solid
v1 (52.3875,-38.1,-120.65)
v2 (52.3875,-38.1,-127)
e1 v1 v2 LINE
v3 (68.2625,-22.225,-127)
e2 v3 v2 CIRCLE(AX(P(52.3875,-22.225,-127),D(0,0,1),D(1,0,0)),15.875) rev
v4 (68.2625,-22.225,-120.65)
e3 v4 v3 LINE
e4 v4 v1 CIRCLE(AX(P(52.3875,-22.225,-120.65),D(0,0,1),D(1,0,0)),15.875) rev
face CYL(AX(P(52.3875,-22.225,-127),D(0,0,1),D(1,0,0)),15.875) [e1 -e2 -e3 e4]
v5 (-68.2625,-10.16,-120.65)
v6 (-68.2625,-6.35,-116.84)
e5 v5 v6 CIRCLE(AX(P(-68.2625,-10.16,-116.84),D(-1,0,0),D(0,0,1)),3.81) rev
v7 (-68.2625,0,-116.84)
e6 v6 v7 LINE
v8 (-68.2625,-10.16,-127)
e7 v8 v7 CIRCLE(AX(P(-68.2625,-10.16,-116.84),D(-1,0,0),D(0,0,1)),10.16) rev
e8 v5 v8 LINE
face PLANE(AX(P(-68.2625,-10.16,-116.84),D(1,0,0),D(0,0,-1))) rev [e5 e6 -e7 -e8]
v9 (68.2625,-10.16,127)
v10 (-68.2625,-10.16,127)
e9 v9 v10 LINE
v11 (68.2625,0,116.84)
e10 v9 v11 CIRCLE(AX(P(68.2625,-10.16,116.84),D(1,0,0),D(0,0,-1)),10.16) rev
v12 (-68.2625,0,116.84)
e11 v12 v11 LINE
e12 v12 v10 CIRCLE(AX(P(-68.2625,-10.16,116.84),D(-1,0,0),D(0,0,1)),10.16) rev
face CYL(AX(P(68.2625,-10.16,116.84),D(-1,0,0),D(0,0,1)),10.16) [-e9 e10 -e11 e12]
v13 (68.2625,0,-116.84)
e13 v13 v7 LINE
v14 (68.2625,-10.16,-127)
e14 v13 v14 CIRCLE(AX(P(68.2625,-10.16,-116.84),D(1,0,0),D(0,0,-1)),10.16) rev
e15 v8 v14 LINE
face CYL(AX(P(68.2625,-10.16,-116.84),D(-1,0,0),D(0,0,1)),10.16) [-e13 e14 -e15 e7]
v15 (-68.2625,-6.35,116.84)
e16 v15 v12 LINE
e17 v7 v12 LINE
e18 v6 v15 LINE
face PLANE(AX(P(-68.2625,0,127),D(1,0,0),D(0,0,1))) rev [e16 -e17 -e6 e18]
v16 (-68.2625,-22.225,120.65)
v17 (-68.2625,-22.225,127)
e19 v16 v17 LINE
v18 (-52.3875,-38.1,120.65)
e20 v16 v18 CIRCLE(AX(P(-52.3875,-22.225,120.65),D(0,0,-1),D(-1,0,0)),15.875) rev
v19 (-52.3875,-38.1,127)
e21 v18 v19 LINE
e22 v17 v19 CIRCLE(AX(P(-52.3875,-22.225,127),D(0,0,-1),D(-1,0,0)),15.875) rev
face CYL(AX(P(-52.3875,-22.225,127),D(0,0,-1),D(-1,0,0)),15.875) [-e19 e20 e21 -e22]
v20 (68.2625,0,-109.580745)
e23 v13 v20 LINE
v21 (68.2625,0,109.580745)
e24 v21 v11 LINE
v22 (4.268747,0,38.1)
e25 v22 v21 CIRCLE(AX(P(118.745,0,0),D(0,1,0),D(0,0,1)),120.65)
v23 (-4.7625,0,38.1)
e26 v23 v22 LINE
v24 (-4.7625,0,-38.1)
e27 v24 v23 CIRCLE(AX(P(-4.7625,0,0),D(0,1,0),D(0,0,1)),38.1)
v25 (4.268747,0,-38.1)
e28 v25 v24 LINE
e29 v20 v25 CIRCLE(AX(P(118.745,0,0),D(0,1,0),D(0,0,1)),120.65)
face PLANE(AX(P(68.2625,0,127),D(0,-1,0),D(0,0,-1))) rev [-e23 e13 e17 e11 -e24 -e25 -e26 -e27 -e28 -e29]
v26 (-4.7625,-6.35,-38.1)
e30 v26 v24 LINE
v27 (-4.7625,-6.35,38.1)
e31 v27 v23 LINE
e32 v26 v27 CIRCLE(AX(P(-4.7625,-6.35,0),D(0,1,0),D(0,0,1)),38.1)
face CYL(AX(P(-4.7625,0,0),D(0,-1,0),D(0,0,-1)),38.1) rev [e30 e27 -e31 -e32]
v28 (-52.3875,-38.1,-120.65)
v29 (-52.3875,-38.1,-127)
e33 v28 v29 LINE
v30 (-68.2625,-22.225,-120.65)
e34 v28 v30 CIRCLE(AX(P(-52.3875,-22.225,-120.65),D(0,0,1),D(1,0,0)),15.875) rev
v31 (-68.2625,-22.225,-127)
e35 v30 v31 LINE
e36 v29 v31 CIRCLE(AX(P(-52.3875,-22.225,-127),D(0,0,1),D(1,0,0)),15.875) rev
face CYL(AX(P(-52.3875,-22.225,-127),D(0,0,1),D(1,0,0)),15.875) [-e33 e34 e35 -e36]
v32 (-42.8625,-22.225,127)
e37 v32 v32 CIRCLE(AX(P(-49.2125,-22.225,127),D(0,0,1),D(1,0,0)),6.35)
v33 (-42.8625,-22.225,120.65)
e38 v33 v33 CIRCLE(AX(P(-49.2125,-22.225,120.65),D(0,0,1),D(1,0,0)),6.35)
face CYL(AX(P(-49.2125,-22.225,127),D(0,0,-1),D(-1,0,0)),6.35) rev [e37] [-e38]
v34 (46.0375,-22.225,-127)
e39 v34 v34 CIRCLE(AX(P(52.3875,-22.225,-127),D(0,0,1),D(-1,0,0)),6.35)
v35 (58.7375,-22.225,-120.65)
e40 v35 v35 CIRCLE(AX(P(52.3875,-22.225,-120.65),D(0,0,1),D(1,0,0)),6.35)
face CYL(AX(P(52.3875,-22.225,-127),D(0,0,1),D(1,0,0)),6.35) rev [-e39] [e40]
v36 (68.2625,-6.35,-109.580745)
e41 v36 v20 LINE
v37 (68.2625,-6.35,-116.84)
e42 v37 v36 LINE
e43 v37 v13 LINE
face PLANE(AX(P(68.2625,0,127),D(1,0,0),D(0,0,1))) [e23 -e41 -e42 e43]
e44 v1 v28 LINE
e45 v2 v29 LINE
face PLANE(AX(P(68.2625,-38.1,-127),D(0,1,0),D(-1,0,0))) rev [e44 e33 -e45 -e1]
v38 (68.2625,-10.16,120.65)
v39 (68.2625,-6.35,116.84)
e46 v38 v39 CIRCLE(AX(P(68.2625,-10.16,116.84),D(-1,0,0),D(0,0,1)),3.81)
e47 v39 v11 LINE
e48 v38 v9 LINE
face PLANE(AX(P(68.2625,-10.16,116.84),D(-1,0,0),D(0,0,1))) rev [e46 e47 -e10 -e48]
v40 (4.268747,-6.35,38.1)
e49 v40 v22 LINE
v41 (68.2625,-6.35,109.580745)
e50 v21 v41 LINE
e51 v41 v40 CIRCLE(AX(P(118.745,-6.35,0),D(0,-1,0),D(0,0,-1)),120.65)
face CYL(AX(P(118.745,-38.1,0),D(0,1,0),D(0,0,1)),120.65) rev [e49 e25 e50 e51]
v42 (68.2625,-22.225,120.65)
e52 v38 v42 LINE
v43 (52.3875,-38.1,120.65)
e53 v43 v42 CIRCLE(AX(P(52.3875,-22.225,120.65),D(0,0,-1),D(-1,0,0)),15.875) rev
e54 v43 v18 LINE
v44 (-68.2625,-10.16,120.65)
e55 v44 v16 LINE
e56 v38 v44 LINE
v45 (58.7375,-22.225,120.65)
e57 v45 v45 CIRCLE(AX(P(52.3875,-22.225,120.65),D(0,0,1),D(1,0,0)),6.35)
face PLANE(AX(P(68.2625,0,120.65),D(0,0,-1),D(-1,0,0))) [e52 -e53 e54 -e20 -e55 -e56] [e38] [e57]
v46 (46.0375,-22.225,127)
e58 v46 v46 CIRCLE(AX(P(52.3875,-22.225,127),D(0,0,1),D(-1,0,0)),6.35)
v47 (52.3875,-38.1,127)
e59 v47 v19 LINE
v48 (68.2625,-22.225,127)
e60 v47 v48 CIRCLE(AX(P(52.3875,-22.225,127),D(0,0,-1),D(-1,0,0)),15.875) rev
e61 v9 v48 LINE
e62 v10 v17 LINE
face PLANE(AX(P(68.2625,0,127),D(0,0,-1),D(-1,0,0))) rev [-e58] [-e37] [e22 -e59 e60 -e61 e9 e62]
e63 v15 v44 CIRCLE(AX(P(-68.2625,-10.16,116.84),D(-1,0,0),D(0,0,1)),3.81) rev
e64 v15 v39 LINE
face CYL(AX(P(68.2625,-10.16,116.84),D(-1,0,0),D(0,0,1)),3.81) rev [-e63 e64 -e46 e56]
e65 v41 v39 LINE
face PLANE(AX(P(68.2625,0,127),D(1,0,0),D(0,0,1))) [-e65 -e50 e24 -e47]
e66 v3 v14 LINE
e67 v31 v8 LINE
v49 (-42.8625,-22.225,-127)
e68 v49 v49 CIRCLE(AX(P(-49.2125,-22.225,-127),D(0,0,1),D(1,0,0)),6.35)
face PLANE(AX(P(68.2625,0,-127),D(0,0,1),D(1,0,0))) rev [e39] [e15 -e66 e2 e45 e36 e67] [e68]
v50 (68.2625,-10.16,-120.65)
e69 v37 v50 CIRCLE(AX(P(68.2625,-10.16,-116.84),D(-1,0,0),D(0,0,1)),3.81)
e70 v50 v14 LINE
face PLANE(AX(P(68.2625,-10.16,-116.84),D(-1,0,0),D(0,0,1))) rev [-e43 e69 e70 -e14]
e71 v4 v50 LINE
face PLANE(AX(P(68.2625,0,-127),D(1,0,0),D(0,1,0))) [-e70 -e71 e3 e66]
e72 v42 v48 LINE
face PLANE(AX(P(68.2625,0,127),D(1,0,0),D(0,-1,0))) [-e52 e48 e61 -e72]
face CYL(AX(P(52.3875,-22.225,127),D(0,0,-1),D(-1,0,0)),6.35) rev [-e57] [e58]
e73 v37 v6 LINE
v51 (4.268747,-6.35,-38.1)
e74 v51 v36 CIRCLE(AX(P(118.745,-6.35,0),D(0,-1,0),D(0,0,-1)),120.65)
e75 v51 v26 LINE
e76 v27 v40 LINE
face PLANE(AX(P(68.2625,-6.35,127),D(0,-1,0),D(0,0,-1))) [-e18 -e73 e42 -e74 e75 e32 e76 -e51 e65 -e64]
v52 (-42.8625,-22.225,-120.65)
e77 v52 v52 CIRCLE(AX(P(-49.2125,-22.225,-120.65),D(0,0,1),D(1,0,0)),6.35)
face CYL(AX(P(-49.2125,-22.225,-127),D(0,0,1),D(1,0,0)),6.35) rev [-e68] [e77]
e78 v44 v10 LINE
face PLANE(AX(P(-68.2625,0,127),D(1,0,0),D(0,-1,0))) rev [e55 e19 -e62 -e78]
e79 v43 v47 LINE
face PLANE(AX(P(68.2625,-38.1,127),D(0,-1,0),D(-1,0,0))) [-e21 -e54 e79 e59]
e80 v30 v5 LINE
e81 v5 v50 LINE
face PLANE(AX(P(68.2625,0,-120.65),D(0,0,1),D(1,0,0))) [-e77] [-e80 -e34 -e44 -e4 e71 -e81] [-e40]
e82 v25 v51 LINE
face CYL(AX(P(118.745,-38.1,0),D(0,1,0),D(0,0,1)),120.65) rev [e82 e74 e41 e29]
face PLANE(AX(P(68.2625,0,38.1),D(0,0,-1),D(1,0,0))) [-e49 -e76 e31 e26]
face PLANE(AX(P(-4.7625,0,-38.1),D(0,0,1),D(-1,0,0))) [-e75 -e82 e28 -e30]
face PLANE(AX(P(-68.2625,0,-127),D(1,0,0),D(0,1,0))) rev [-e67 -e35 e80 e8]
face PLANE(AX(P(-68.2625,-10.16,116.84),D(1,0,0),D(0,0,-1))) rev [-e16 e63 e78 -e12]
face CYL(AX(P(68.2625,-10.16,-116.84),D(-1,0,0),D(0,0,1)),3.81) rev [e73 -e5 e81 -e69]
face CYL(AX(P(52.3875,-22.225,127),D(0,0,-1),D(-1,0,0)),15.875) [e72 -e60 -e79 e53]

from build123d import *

# Parameters (mm, degrees)
EXTRUDE_THIN1_DEPTH    = 68.2625
SKETCH2_R              = 6.35
CUT_EXTRUDE1_DEPTH     = 266.758121054
FILLET1_R              = 15.875
CUT_EXTRUDE2_DEPTH     = 150.132085435
CONVERT_SOLID1_START   = -68.2625
CONVERT_SOLID1_DEPTH   = 136.525
CONVERT_SOLID1_2_DEPTH = 136.525
SKETCH8_R              = 120.65
CUT_EXTRUDE3_DEPTH     = 150.132085435


# Read off the part's stored shape, not the designer's step: Convert-Solid1
with BuildPart() as part:
    # Sketch1 → Extrude-Thin1 (new, symmetric)
    with BuildSketch(Plane(origin=(0, 0, 0), x_dir=(0, 0, -1), z_dir=(1, 0, 0))):
        Polygon((-127, -38.1), (-127, 0), (127, 0), (127, -38.1), (120.65, -38.1), (120.65, -6.35), (-120.65, -6.35), (-120.65, -38.1), align=None)
    extrude(amount=EXTRUDE_THIN1_DEPTH, both=True)

    # Sketch2 → Cut-Extrude1 (cut, through all)
    with BuildSketch(Plane.XY.offset(127)):
        with Locations((-49.2125, -22.225)):
            Circle(SKETCH2_R)
        with Locations((52.3875, -22.225)):
            Circle(SKETCH2_R)
    extrude(amount=-CUT_EXTRUDE1_DEPTH, mode=Mode.SUBTRACT)

    # Fillet1
    fillet1_edges = [part.edges().sort_by_distance(p)[0] for p in [
        (68.2625, -38.1, -123.825),
        (-68.2625, -38.1, -123.825),
        (68.2625, -38.1, 123.825),
        (-68.2625, -38.1, 123.825),
    ]]
    fillet(fillet1_edges, radius=FILLET1_R)

    # Sketch3 → Cut-Extrude2 (cut, through all)
    with BuildSketch(Plane(origin=(0, 0, 0), x_dir=(1, 0, 0), z_dir=(0, 1, 0))):
        with BuildLine():
            Line((-4.7625, 38.1), (68.2625, 38.1))
            Line((68.2625, 38.1), (68.2625, -38.1))
            Line((68.2625, -38.1), (-4.7625, -38.1))
            ThreePointArc((-4.7625, -38.1), (-42.8625, 0), (-4.7625, 38.1))
        make_face()
    extrude(amount=-CUT_EXTRUDE2_DEPTH, mode=Mode.SUBTRACT)

    # Convert-Solid1 outline → Convert-Solid1 (cut)
    with BuildSketch(Plane.YZ.offset(CONVERT_SOLID1_START)):
        with BuildLine():
            Line((0, -127), (0, -116.84))
            ThreePointArc((0, -116.84), (-2.975795103, -124.024204897), (-10.16, -127))
            Line((-10.16, -127), (0, -127))
        make_face()
        with BuildLine():
            ThreePointArc((-10.16, 127), (-2.975795103, 124.024204897), (0, 116.84))
            Line((0, 116.84), (0, 127))
            Line((0, 127), (-10.16, 127))
        make_face()
    extrude(amount=CONVERT_SOLID1_DEPTH, mode=Mode.SUBTRACT)

    # Convert-Solid1 2 outline → Convert-Solid1 2 (add)
    with BuildSketch(Plane.YZ.offset(CONVERT_SOLID1_START)):
        with BuildLine():
            Line((-6.35, -120.65), (-6.35, -116.84))
            ThreePointArc((-6.35, -116.84), (-7.465923164, -119.534076836), (-10.16, -120.65))
            Line((-10.16, -120.65), (-6.35, -120.65))
        make_face()
        with BuildLine():
            ThreePointArc((-10.16, 120.65), (-7.465923164, 119.534076836), (-6.35, 116.84))
            Line((-6.35, 116.84), (-6.35, 120.65))
            Line((-6.35, 120.65), (-10.16, 120.65))
        make_face()
    extrude(amount=CONVERT_SOLID1_2_DEPTH)

    # Sketch8 → Cut-Extrude3 (cut, through all)
    with BuildSketch(Plane(origin=(0, 0, 0), x_dir=(1, 0, 0), z_dir=(0, 1, 0))):
        with Locations((118.745, 0)):
            Circle(SKETCH8_R)
    extrude(amount=-CUT_EXTRUDE3_DEPTH, mode=Mode.SUBTRACT)


solid = part.part
